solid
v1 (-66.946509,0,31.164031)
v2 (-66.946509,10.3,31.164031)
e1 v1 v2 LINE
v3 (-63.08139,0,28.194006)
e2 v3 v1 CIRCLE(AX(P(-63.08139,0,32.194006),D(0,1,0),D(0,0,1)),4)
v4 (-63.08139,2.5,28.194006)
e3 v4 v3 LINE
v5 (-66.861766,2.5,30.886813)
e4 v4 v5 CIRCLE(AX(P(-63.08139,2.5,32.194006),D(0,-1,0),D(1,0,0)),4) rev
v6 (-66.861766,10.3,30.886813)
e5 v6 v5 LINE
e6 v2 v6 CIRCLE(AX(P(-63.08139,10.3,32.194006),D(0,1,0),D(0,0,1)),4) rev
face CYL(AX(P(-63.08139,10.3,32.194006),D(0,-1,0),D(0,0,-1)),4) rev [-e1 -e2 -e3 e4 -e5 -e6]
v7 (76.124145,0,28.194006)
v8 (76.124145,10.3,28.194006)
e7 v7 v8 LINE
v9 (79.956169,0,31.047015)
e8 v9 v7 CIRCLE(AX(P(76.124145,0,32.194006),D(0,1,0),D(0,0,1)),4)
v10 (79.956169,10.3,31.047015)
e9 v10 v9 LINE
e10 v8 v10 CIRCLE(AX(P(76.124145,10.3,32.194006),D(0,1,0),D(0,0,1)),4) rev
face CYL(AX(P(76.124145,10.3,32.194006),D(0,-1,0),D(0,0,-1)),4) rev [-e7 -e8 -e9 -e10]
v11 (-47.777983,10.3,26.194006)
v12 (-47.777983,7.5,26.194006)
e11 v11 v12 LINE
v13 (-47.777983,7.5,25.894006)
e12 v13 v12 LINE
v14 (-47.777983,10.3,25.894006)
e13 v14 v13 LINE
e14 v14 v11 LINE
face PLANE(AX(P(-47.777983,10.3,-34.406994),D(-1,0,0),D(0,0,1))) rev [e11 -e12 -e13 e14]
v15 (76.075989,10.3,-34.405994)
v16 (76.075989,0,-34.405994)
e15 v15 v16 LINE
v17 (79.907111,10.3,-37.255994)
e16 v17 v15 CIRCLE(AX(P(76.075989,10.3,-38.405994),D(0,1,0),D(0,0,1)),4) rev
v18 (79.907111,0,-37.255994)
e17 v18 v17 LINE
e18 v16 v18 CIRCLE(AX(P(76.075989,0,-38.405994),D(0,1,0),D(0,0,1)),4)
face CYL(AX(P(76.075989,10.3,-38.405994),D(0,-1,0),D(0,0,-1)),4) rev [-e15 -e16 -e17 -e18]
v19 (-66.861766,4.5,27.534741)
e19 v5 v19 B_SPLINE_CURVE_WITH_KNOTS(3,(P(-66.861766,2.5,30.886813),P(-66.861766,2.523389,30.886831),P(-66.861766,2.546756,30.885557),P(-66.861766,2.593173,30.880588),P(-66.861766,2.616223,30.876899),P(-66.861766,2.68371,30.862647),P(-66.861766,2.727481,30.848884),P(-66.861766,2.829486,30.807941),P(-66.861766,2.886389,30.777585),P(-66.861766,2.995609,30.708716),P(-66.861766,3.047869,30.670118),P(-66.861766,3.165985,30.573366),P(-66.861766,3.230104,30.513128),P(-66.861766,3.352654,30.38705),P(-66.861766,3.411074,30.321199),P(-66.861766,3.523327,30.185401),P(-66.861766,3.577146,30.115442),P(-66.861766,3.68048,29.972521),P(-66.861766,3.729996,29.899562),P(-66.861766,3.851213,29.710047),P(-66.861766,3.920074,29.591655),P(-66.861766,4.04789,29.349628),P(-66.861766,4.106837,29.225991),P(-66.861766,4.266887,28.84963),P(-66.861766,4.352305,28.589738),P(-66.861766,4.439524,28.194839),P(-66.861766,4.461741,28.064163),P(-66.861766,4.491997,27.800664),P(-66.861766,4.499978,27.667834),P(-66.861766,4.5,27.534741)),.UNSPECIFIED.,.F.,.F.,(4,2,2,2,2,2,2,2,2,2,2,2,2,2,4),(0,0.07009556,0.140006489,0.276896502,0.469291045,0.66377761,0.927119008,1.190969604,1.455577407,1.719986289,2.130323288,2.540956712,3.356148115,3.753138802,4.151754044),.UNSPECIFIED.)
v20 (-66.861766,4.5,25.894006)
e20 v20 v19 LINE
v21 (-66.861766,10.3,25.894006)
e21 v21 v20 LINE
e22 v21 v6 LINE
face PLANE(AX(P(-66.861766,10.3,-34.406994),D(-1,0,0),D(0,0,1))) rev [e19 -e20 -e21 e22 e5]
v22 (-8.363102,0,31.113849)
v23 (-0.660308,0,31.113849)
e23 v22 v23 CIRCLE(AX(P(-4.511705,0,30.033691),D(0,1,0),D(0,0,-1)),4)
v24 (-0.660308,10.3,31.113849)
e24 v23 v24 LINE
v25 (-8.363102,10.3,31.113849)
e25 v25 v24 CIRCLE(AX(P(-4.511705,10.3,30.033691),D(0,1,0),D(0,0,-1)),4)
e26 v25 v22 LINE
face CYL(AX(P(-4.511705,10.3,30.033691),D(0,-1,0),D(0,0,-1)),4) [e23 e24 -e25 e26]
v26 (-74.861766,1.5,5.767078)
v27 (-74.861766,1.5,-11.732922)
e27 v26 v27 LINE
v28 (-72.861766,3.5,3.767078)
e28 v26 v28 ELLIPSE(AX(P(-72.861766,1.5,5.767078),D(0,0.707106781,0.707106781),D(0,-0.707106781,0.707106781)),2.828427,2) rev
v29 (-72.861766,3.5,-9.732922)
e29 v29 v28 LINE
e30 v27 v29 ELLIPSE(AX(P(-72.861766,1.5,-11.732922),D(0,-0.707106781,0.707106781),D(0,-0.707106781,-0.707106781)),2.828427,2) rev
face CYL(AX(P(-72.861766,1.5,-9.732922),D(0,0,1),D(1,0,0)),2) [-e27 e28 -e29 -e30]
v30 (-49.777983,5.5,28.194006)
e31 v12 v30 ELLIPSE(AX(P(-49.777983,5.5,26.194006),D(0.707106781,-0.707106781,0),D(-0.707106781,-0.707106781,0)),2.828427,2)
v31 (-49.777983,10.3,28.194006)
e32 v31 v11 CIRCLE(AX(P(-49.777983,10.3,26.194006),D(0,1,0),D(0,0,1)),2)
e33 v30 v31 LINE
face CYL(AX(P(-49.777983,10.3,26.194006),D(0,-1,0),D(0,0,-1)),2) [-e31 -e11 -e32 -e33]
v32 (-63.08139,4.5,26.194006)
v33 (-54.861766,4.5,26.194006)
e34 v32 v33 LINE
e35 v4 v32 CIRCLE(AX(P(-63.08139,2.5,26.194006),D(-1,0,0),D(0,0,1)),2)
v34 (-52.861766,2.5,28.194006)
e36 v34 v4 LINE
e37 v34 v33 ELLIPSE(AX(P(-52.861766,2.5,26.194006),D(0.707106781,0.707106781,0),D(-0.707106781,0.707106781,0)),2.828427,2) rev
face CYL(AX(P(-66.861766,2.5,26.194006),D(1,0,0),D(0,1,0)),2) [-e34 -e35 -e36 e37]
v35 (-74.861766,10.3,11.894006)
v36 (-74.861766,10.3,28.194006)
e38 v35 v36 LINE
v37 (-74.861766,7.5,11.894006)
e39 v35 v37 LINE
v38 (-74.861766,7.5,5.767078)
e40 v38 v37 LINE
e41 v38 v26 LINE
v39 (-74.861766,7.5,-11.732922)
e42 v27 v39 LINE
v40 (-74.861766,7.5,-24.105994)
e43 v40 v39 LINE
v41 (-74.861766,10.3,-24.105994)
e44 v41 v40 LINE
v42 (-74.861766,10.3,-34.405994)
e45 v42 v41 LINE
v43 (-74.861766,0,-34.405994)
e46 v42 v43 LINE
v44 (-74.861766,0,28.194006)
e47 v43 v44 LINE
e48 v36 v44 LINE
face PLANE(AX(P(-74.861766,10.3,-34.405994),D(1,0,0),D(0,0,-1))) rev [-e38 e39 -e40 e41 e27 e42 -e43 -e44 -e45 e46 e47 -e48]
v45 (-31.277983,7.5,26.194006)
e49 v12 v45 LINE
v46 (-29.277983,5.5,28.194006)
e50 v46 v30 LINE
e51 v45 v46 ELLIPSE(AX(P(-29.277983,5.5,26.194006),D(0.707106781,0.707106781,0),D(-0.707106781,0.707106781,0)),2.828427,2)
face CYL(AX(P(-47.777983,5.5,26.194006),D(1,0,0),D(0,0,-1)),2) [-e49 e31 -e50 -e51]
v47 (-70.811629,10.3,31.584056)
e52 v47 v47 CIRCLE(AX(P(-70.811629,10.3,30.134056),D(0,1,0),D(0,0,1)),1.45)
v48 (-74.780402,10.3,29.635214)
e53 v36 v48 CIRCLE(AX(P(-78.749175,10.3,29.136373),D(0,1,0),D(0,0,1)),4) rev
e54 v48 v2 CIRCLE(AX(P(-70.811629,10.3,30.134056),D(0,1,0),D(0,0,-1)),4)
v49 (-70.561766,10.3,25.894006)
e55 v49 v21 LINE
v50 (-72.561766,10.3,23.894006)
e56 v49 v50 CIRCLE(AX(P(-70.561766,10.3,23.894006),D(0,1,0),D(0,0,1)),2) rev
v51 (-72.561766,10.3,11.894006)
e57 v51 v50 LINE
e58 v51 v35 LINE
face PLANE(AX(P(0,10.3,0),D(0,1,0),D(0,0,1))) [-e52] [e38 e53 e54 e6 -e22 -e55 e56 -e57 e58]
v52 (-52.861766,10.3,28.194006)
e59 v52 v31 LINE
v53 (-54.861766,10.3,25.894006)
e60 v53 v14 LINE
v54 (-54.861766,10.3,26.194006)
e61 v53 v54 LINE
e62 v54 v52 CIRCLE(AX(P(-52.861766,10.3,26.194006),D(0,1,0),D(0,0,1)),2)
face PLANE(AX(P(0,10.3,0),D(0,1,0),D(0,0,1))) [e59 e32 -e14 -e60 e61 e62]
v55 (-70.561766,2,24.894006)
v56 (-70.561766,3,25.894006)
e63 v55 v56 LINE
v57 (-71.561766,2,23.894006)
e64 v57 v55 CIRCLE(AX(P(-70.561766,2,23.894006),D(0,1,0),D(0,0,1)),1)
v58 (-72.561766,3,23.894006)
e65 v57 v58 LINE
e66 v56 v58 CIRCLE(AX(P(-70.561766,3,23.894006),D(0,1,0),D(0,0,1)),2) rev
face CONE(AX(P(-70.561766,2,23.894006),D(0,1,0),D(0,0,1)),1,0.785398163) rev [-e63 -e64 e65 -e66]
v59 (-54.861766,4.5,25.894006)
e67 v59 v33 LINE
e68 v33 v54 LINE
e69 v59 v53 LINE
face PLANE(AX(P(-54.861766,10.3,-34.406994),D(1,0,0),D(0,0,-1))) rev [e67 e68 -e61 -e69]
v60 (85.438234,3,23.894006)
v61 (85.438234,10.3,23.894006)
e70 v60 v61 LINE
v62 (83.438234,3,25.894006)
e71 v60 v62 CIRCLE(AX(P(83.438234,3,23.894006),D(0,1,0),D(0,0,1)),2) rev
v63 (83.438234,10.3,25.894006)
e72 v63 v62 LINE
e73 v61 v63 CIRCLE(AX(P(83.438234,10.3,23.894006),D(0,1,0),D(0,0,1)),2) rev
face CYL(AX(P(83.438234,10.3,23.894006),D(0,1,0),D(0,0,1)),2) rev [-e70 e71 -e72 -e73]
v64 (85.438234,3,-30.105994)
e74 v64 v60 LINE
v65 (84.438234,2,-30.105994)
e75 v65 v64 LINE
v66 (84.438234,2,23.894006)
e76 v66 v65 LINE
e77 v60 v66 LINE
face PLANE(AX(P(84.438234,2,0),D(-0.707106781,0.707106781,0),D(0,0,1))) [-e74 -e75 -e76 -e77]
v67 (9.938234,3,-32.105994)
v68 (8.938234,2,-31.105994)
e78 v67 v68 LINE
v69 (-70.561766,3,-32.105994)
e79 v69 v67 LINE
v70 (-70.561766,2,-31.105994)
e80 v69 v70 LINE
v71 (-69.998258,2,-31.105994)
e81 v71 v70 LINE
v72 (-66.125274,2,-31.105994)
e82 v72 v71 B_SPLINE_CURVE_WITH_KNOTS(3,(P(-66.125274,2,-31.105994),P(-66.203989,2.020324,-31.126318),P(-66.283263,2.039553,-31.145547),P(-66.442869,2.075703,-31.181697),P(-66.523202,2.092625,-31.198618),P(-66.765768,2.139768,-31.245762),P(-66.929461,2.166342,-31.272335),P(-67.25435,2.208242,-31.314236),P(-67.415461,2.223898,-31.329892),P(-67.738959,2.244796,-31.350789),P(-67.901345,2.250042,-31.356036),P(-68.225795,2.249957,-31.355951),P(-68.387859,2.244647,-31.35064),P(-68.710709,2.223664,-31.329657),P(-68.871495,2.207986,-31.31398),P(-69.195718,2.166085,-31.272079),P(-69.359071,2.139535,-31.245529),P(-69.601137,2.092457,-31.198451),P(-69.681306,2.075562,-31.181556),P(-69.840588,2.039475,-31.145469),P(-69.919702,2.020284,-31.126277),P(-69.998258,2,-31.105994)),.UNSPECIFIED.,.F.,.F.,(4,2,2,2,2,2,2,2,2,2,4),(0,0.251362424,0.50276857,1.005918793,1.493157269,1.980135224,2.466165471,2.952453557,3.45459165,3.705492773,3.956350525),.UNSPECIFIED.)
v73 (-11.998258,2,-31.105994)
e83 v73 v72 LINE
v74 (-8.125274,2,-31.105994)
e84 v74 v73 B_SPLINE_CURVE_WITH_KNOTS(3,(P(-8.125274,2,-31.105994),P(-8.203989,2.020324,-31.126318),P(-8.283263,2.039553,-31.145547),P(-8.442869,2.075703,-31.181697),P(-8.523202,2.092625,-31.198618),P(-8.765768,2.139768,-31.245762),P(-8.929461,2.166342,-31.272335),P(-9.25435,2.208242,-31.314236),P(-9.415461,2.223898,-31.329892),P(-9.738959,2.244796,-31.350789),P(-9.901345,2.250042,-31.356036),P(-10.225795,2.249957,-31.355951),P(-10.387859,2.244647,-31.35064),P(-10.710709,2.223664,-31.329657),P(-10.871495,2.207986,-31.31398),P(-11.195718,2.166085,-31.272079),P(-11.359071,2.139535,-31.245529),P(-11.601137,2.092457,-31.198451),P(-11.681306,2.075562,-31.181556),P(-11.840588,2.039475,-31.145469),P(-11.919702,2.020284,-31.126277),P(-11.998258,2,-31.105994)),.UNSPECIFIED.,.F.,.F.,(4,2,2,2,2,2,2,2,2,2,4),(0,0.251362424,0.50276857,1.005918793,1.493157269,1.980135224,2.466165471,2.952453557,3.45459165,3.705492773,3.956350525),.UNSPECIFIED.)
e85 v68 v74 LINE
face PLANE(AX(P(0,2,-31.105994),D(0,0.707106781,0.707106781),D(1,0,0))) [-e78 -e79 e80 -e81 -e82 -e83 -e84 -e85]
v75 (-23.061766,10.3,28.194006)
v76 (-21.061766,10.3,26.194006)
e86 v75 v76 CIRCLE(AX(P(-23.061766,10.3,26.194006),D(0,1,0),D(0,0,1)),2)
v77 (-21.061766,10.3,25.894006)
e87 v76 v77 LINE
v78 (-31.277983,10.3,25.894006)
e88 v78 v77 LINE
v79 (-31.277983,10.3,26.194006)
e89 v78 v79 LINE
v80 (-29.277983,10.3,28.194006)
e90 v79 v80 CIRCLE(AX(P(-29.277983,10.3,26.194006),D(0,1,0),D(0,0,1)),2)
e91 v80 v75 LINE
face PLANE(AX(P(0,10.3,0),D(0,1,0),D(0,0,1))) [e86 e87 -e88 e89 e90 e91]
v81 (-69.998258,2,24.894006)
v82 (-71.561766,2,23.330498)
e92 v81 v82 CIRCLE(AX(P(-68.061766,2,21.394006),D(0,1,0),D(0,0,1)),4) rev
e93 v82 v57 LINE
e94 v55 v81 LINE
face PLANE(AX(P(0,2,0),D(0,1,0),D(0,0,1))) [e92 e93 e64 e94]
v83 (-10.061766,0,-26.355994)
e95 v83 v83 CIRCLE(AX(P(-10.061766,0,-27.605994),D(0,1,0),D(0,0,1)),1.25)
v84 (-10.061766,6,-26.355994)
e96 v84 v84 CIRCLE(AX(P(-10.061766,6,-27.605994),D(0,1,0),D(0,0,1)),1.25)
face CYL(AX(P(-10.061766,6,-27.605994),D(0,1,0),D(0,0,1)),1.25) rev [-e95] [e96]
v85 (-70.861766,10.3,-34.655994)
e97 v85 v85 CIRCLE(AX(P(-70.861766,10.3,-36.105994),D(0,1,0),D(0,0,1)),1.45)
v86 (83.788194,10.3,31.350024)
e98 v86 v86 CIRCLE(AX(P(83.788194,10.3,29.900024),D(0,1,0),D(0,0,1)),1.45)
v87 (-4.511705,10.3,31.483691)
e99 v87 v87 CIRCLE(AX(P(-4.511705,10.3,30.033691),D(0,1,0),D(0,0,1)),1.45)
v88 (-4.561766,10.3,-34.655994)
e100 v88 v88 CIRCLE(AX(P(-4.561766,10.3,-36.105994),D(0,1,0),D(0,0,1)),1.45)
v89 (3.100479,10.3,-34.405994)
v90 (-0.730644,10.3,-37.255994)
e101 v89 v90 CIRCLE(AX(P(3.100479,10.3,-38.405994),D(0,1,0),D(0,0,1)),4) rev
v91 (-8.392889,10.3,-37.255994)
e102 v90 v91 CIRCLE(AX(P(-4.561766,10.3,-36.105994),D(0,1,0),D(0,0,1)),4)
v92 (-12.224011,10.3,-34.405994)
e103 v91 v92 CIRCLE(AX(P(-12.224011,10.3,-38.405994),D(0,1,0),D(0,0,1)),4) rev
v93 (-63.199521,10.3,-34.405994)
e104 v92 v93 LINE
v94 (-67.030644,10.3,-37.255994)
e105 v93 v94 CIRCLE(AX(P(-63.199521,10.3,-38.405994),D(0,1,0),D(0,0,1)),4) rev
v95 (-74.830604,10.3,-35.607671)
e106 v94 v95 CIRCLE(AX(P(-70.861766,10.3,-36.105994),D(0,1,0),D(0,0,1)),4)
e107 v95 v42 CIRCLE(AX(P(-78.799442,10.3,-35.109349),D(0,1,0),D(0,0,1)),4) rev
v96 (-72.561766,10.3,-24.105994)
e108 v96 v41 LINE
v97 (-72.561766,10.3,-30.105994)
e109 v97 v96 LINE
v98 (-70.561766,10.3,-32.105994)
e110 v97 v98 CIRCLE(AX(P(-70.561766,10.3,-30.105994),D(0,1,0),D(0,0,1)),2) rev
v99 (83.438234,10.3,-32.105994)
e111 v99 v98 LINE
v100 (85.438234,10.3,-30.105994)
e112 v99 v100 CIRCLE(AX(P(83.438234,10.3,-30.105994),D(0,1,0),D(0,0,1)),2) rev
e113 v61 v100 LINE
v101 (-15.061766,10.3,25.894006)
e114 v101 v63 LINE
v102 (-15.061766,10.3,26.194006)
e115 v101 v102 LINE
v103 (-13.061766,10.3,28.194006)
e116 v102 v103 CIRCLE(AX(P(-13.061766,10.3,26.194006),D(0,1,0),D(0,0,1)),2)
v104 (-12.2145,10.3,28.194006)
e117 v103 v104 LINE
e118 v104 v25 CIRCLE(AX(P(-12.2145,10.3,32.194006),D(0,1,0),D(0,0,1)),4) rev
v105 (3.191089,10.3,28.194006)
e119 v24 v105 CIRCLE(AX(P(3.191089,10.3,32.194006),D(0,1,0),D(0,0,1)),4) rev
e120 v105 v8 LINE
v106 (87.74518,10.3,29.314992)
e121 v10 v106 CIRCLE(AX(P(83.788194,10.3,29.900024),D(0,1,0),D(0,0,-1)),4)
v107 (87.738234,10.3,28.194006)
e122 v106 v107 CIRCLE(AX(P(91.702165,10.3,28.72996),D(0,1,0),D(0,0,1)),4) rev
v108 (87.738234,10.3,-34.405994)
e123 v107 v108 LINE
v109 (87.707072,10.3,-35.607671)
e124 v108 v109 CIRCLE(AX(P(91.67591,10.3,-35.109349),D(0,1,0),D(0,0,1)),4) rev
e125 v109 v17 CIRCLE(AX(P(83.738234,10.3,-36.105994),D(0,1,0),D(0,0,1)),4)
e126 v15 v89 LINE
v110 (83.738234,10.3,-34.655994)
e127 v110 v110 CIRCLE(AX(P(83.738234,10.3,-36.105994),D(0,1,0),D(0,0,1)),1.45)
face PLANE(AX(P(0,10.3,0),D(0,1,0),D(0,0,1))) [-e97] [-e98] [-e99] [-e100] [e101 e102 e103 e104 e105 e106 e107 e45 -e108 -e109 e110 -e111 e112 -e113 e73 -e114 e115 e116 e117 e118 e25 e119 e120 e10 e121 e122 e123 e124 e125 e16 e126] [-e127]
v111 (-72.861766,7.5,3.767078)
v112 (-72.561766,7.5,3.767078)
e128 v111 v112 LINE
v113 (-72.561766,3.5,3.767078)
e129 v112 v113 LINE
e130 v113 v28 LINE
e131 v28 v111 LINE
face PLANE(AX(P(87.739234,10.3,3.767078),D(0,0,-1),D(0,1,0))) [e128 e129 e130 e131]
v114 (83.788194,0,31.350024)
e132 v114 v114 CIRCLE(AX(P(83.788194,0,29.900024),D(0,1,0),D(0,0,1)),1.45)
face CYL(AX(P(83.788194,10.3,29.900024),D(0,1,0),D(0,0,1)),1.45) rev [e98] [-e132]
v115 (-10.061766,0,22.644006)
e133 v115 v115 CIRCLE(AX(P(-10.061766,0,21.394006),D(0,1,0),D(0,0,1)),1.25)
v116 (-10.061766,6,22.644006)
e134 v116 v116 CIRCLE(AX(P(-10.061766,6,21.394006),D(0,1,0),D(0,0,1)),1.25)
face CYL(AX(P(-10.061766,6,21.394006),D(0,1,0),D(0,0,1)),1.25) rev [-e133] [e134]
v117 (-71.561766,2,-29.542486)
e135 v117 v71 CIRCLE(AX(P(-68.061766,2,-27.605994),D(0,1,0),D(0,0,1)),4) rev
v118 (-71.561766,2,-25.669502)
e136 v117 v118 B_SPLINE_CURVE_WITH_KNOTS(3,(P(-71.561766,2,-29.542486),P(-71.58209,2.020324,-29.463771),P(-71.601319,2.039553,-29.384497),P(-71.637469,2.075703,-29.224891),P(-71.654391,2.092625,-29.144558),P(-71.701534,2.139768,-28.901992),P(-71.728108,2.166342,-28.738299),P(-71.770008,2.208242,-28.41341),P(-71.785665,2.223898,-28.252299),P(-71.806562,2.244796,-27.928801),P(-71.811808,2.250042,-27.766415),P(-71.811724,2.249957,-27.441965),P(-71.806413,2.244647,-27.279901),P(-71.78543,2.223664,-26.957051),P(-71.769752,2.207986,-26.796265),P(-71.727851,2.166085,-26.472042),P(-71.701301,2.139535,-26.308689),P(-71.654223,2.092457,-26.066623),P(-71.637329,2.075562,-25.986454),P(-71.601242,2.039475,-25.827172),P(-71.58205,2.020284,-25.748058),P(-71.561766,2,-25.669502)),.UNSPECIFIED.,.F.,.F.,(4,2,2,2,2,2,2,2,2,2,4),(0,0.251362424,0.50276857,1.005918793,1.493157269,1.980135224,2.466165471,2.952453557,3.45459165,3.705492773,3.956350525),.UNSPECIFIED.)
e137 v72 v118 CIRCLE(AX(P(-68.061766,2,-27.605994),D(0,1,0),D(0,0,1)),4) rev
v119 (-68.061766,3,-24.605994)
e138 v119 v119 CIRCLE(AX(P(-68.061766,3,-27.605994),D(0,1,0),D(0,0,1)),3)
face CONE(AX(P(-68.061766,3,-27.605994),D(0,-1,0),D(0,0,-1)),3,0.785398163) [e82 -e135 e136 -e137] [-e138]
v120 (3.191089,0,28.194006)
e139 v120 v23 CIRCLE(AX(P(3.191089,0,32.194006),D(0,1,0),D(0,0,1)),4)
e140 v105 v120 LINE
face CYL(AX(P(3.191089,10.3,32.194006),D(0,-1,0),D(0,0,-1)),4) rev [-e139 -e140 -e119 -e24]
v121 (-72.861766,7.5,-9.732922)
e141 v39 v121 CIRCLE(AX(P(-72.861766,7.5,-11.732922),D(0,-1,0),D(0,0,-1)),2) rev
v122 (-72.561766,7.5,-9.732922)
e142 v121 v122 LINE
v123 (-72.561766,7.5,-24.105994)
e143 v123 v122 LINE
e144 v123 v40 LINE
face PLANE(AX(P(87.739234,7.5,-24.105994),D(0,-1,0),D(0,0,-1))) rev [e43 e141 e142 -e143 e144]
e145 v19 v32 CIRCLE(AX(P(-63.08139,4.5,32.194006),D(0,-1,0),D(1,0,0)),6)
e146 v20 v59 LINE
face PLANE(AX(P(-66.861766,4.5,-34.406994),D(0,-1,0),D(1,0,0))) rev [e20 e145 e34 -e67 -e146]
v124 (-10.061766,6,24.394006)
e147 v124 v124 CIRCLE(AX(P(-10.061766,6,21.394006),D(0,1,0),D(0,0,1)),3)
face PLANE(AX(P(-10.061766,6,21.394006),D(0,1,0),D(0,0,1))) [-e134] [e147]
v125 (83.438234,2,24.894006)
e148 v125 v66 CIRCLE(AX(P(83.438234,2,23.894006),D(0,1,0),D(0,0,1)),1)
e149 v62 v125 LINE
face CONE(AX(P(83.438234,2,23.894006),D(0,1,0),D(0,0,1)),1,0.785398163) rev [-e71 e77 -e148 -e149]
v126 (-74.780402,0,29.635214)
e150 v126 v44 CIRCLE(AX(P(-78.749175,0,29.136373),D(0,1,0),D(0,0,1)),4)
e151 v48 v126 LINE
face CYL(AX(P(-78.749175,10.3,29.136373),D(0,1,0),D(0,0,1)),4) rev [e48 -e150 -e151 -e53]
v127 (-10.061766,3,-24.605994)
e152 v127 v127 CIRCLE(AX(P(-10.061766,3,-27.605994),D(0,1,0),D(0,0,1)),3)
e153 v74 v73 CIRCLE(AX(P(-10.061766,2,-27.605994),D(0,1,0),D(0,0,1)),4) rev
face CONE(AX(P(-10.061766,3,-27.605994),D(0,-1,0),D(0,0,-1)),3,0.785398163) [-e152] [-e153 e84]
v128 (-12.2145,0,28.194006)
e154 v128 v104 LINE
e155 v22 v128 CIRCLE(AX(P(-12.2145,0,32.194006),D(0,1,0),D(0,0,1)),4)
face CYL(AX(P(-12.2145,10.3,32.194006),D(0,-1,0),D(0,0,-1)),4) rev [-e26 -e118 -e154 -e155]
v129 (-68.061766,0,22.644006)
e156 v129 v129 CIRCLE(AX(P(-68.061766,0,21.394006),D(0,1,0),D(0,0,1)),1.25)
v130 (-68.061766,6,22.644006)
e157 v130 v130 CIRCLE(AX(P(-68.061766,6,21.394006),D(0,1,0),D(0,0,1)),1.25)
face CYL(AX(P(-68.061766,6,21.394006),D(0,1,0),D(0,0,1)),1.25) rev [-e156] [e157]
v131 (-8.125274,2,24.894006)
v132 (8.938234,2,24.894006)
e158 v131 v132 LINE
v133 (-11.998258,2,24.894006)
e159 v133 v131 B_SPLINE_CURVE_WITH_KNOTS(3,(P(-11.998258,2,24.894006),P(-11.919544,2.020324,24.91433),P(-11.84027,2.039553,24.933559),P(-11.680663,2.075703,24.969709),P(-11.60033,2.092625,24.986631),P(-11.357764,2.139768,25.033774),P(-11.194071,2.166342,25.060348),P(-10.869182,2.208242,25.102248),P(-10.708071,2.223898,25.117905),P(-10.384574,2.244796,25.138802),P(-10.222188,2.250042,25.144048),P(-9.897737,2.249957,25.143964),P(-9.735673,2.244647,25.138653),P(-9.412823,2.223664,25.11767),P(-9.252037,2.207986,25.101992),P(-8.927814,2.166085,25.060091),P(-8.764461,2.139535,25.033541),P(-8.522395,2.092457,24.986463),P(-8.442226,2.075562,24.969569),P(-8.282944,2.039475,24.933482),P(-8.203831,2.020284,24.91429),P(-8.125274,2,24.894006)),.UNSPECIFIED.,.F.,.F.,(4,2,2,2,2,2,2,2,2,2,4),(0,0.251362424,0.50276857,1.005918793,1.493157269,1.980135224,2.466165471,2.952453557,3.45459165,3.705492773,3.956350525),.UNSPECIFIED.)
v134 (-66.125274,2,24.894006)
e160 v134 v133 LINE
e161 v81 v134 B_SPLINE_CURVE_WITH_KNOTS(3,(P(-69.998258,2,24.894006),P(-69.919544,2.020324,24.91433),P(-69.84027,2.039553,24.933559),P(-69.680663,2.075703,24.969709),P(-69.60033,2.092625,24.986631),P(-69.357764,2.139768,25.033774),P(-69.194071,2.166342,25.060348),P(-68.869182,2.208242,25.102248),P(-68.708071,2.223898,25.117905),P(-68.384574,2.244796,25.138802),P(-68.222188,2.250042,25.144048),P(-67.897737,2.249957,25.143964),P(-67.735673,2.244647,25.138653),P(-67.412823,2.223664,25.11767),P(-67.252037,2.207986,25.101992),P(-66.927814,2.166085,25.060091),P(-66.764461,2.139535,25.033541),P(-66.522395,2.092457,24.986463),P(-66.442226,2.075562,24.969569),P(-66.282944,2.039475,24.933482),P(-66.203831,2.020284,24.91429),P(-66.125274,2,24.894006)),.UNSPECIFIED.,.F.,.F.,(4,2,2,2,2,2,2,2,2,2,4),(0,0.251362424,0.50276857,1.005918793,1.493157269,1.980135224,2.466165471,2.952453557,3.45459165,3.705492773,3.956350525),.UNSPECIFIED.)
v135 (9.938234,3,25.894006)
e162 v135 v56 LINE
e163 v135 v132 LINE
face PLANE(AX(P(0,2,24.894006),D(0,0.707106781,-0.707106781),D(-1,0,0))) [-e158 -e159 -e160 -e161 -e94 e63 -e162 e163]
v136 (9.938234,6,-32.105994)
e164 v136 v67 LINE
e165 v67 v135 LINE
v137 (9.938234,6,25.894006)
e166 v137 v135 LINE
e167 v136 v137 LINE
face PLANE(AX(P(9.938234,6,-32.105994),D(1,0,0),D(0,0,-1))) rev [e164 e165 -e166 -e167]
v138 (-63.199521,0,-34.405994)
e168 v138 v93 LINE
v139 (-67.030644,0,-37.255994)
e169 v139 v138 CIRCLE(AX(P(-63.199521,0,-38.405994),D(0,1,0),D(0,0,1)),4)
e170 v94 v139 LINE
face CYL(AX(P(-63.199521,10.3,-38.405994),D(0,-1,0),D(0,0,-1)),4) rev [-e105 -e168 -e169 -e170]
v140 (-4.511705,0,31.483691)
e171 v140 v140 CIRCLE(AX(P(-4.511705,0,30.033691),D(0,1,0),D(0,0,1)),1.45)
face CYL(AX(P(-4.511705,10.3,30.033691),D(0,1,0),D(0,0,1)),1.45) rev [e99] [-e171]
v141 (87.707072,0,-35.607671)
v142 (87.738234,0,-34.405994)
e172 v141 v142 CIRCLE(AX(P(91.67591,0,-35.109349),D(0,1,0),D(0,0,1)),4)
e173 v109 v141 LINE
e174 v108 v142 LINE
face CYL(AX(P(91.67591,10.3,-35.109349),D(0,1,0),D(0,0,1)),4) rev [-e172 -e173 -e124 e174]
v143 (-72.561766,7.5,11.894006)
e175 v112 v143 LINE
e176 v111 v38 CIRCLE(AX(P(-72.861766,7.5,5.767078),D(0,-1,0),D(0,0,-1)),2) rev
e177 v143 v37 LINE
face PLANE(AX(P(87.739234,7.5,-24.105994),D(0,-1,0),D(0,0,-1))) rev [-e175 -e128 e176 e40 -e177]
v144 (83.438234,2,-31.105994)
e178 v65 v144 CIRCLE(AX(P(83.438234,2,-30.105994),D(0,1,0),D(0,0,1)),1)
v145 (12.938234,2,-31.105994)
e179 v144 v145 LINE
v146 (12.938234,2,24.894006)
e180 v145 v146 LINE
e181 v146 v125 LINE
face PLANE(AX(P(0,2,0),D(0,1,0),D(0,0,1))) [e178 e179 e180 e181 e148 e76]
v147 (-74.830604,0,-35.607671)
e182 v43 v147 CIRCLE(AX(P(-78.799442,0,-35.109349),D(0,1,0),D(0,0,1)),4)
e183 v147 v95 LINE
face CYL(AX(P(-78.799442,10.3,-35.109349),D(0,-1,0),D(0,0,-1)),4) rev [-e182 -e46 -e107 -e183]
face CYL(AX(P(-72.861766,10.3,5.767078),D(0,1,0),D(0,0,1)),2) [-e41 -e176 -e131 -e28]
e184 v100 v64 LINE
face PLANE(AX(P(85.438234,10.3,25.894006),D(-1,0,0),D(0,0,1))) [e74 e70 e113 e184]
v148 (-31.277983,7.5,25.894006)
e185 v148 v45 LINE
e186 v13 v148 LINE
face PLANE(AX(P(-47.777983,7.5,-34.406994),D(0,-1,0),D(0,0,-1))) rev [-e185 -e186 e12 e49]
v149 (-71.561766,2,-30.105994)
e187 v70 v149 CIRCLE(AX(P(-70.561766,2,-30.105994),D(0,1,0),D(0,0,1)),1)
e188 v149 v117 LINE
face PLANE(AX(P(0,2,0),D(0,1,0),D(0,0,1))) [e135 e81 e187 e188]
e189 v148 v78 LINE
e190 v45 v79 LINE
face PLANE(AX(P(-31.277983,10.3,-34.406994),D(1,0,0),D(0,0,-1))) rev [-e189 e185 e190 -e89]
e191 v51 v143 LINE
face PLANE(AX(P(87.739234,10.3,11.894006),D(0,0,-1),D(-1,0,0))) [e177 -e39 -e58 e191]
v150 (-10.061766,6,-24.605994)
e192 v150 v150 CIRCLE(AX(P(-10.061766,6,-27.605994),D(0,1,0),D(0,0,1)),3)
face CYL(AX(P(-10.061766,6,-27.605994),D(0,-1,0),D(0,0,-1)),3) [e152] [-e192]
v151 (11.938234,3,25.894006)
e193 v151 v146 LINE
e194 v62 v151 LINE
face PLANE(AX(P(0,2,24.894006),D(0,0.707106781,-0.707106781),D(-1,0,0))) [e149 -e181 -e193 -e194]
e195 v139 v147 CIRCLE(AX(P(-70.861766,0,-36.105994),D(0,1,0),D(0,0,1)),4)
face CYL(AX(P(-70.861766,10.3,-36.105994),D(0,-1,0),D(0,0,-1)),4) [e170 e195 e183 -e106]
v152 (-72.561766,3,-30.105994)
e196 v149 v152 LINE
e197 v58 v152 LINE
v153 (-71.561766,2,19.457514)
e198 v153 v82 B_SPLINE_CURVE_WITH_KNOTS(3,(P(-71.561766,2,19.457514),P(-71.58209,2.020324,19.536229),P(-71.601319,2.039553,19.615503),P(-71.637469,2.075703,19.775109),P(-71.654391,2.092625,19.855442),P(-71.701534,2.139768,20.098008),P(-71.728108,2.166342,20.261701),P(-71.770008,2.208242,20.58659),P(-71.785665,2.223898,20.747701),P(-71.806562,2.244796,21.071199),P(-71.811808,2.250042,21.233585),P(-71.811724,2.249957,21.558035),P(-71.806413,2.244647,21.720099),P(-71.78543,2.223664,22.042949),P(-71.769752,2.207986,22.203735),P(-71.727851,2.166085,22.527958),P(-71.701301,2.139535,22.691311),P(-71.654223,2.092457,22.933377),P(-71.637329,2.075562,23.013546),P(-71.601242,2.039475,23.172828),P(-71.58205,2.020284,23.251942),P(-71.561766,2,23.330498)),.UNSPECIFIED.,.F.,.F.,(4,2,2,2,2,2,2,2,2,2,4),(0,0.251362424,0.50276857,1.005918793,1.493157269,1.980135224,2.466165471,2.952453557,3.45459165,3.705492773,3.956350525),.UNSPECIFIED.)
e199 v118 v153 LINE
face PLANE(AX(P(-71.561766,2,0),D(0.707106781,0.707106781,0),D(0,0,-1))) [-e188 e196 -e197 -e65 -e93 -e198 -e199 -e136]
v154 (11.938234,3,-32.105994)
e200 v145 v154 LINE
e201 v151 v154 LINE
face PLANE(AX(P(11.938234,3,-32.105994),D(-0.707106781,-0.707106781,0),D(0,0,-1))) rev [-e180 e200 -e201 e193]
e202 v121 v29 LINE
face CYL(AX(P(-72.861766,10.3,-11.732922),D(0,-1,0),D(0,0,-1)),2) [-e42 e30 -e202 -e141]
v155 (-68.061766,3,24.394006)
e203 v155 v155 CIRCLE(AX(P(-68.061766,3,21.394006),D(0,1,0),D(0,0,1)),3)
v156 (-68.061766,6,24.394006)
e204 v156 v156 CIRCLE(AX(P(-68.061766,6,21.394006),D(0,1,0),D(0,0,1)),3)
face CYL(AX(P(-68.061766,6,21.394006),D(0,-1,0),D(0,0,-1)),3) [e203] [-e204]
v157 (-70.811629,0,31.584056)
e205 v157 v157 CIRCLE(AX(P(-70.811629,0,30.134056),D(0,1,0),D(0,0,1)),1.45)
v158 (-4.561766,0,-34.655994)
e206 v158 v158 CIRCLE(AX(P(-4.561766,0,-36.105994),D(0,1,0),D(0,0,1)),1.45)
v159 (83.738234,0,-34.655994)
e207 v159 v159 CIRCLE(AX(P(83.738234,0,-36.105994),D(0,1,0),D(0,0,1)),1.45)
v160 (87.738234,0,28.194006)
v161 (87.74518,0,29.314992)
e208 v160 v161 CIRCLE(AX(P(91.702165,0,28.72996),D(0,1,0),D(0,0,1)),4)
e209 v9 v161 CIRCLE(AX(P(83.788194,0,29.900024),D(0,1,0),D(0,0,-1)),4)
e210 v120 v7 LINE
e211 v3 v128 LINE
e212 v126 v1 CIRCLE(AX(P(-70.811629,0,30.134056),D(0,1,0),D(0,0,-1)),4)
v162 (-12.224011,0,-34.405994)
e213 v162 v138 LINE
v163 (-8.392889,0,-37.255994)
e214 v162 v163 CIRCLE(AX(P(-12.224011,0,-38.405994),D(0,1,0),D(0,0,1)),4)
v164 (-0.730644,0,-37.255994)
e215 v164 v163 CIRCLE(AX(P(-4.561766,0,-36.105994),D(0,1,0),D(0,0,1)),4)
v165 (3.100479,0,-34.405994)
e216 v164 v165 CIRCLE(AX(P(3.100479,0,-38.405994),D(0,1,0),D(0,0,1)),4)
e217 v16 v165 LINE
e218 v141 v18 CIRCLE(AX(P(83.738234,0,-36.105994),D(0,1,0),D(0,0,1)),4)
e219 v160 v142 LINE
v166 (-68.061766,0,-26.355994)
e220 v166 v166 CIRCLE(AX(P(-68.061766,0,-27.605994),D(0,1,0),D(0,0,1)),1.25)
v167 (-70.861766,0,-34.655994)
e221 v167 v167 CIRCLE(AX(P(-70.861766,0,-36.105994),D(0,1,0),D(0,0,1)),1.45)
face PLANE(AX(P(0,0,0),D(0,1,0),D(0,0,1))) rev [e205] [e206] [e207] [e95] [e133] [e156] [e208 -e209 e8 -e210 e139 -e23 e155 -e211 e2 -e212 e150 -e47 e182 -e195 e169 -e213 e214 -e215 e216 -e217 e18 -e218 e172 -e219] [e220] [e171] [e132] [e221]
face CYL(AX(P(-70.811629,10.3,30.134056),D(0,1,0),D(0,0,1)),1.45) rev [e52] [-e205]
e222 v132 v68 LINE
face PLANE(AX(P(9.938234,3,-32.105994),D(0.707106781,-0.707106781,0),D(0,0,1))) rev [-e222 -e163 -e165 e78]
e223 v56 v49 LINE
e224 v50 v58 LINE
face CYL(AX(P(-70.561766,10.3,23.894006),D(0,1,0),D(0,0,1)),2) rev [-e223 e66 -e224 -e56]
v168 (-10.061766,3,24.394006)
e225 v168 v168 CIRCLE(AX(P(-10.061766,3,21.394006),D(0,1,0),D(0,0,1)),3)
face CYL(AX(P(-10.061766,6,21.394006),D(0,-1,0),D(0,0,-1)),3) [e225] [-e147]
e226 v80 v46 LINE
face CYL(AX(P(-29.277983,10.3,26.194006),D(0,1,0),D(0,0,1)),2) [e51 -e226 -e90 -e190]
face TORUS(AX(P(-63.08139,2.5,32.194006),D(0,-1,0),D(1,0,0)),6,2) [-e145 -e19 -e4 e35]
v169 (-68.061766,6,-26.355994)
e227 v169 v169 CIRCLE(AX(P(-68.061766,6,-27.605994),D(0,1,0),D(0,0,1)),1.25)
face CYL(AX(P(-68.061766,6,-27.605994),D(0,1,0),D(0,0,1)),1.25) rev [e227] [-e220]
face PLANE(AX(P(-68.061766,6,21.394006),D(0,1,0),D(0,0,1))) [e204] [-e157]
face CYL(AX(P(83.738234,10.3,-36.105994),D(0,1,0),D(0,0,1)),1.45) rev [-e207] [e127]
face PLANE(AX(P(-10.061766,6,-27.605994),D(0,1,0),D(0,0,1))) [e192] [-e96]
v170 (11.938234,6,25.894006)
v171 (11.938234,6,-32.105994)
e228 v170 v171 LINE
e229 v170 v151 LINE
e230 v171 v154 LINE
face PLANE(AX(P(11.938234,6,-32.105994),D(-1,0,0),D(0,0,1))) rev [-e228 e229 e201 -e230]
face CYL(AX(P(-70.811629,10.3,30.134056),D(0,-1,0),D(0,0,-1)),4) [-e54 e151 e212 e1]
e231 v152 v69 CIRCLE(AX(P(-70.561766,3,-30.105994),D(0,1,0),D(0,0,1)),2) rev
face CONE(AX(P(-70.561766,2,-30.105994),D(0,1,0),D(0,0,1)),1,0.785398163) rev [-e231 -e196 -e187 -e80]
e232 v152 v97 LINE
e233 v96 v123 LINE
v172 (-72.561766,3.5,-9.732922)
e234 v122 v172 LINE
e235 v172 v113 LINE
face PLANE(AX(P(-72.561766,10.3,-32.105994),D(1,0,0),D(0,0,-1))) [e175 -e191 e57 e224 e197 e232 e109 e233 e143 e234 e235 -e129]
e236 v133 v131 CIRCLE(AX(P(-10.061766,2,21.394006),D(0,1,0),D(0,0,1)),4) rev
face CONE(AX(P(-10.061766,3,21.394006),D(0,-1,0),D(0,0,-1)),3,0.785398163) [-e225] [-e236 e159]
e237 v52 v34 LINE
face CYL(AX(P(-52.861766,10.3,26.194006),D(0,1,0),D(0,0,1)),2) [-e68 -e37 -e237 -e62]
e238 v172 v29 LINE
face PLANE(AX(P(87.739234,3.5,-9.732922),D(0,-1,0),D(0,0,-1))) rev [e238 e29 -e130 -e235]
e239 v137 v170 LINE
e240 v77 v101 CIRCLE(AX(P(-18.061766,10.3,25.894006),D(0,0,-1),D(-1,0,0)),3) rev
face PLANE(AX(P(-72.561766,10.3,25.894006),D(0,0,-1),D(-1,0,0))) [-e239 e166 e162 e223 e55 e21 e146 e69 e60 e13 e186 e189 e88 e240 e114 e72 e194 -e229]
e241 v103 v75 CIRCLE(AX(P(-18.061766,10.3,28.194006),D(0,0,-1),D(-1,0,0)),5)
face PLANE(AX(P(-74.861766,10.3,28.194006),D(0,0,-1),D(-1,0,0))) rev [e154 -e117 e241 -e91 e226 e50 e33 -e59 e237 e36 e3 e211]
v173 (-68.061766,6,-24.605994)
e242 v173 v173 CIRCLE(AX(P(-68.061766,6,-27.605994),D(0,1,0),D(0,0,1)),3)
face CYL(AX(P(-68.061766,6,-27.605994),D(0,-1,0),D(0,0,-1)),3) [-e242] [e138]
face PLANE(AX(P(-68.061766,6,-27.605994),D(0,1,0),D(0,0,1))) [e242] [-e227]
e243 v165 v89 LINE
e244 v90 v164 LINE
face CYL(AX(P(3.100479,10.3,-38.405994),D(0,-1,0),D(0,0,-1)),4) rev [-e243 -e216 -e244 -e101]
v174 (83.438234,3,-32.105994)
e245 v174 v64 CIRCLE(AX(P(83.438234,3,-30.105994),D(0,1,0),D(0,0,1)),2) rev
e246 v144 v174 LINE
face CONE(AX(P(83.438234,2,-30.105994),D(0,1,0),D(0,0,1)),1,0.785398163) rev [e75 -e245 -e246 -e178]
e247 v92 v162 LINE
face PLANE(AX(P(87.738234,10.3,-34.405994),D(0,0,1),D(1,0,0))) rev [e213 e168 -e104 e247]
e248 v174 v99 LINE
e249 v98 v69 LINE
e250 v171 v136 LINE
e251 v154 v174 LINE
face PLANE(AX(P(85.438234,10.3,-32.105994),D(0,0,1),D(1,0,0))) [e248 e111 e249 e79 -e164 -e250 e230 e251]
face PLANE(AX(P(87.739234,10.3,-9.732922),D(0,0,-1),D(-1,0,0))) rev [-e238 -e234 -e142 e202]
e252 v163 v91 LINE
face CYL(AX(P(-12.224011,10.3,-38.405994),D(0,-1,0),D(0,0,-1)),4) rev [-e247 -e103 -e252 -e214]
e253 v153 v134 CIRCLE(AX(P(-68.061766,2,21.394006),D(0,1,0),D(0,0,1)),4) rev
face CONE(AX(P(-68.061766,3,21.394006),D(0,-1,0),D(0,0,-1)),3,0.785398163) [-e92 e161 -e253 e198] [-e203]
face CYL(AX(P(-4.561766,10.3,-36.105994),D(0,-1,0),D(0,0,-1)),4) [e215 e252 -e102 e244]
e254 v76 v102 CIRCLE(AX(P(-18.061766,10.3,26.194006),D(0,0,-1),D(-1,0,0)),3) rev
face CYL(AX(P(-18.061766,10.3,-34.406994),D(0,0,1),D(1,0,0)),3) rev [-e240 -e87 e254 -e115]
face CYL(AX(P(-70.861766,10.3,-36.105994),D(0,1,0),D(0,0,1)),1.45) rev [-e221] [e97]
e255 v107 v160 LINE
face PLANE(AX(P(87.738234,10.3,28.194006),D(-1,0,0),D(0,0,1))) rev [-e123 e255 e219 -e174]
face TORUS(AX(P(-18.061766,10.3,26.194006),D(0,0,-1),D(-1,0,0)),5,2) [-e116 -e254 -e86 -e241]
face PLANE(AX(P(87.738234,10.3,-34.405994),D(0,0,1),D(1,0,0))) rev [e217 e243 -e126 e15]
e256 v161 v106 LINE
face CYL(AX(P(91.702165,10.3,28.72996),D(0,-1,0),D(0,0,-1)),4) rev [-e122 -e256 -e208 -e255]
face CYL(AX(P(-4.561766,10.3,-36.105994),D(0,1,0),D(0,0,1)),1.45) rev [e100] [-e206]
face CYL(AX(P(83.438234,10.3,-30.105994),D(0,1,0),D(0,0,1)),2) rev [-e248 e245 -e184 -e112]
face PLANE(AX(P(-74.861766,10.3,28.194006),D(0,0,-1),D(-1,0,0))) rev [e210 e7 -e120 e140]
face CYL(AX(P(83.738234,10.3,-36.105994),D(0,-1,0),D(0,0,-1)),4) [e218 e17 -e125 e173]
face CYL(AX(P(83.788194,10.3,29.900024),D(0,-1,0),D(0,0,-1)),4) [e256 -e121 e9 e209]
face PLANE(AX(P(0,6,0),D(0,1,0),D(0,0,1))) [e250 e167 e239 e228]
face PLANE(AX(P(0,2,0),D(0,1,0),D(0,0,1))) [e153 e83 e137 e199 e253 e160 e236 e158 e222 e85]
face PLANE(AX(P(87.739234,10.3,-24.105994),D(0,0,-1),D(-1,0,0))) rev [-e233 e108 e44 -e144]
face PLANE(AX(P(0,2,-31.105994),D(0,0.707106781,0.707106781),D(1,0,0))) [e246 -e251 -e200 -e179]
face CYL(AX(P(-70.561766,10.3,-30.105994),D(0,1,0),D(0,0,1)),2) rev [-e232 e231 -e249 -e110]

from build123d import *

# Parameters (mm, degrees)
SKETCH3_W                      = 162.6
SKETCH3_H                      = 62.6
SKETCH3_W_2                    = 158
SKETCH3_H_2                    = 58
BOSS_EXTRUDE1_DEPTH            = 10.3
SKETCH5_W                      = 158
SKETCH5_H                      = 58
BOSS_EXTRUDE2_DEPTH            = 2
SKETCH6_R                      = 3
BOSS_EXTRUDE3_DEPTH            = 4
F_2_5_2_5_DIAMETER_HOLE1_D     = 2.5
F_2_5_2_5_DIAMETER_HOLE1_DEPTH = 8
F_2_5_2_5_DIAMETER_HOLE1_TIP   = 0.751075774
SKETCH10_W                     = 2
SKETCH10_H                     = 58
BOSS_EXTRUDE4_DEPTH            = 4
CUT_EXTRUDE1_REACH             = 110.272
SKETCH11_R                     = 3
SKETCH11_W                     = 12
SKETCH11_H                     = 5.8
SKETCH11_W_2                   = 16.5
SKETCH11_H_2                   = 2.8
CUT_EXTRUDE2_REACH             = 168.519
SKETCH12_W                     = 13.5
SKETCH12_H                     = 6.8
SKETCH12_W_2                   = 36
SKETCH12_H_2                   = 2.8
SKETCH13_R                     = 4
BOSS_EXTRUDE5_DEPTH            = 10.3
FILLET2_R                      = 4
FILLET3_R                      = 4
FILLET4_R                      = 4
F_2_9_2_9_DIAMETER_HOLE1_D     = 2.9
FILLET6_R                      = 2
FILLET7_R                      = 2
FILLET8_R                      = 2
CHAMFER1_SIZE                  = 1
CHAMFER2_SIZE                  = 1
FILLET9_R                      = 2


with BuildPart() as part:
    # Sketch3 → Boss-Extrude1 (new body)
    with BuildSketch(Plane(origin=(0, 0, 0), x_dir=(1, 0, 0), z_dir=(0, 1, 0))):
        with Locations((6.438233838, 3.105993834)):
            Rectangle(SKETCH3_W, SKETCH3_H)
        with Locations((6.438233838, 3.105993834)):
            Rectangle(SKETCH3_W_2, SKETCH3_H_2, mode=Mode.SUBTRACT)
    extrude(amount=BOSS_EXTRUDE1_DEPTH)

    # Sketch5 → Boss-Extrude2 (add)
    with BuildSketch(Plane(origin=(0, 0, 0), x_dir=(1, 0, 0), z_dir=(0, 1, 0))):
        with Locations((6.438233838, 3.105993834)):
            Rectangle(SKETCH5_W, SKETCH5_H)
    extrude(amount=BOSS_EXTRUDE2_DEPTH)

    # Sketch6 → Boss-Extrude3 (add)
    with BuildSketch(Plane(origin=(0, 2, 0), x_dir=(1, 0, 0), z_dir=(0, 1, 0))):
        with Locations(Location((-68.061766162, 27.605993834, 0), (0, 0, 270))):
            Circle(SKETCH6_R)
        with Locations(Location((-68.061766162, -21.394006166, 0), (0, 0, 270))):
            Circle(SKETCH6_R)
        with Locations(Location((-10.061766162, -21.394006166, 0), (0, 0, 270))):
            Circle(SKETCH6_R)
        with Locations(Location((-10.061766162, 27.605993834, 0), (0, 0, 270))):
            Circle(SKETCH6_R)
    extrude(amount=BOSS_EXTRUDE3_DEPTH)

    # Ø2.5 (2.5) Diameter Hole1
    with Locations(Plane(origin=(0, 6, 0), x_dir=(1, 0, 0), z_dir=(0, 1, 0))):
        with Locations((-68.061766162, 27.605993834), (-10.061766162, 27.605993834), (-10.061766162, -21.394006166), (-68.061766162, -21.394006166)):
            Hole(F_2_5_2_5_DIAMETER_HOLE1_D / 2, depth=F_2_5_2_5_DIAMETER_HOLE1_DEPTH)
            with Locations((0, 0, -(F_2_5_2_5_DIAMETER_HOLE1_DEPTH + F_2_5_2_5_DIAMETER_HOLE1_TIP / 2))):  # 118° drill point
                Cone(0, F_2_5_2_5_DIAMETER_HOLE1_D / 2, F_2_5_2_5_DIAMETER_HOLE1_TIP, mode=Mode.SUBTRACT)

    # Sketch10 → Boss-Extrude4 (add)
    with BuildSketch(Plane(origin=(0, 2, 0), x_dir=(1, 0, 0), z_dir=(0, 1, 0))):
        with Locations((10.938233838, 3.105993834)):
            Rectangle(SKETCH10_W, SKETCH10_H)
    extrude(amount=BOSS_EXTRUDE4_DEPTH)

    # Sketch11 → Cut-Extrude1 (cut, up to next)
    with BuildSketch(Plane.XY.offset(28.194006166), mode=Mode.PRIVATE) as cut_extrude1_sk1:
        with Locations((-18.061766162, 10.3)):
            Circle(SKETCH11_R)
    cut_extrude1_tool1 = extrude(cut_extrude1_sk1.sketch, amount=-CUT_EXTRUDE1_REACH, mode=Mode.PRIVATE) & part.part
    # Sketch11 → Cut-Extrude1 (cut, up to next)
    with BuildSketch(Plane.XY.offset(28.194006166), mode=Mode.PRIVATE) as cut_extrude1_sk2:
        with Locations((-60.861766162, 7.4)):
            Rectangle(SKETCH11_W, SKETCH11_H)
    cut_extrude1_tool2 = extrude(cut_extrude1_sk2.sketch, amount=-CUT_EXTRUDE1_REACH, mode=Mode.PRIVATE) & part.part
    # Sketch11 → Cut-Extrude1 (cut, up to next)
    with BuildSketch(Plane.XY.offset(28.194006166), mode=Mode.PRIVATE) as cut_extrude1_sk3:
        with Locations((-39.527982648, 8.9)):
            Rectangle(SKETCH11_W_2, SKETCH11_H_2)
    cut_extrude1_tool3 = extrude(cut_extrude1_sk3.sketch, amount=-CUT_EXTRUDE1_REACH, mode=Mode.PRIVATE) & part.part
    add(cut_extrude1_tool1.solids().sort_by_distance((-18.061766, 10.3, 28.194006))[0], mode=Mode.SUBTRACT)
    add(cut_extrude1_tool2.solids().sort_by_distance((-60.861766, 7.4, 28.194006))[0], mode=Mode.SUBTRACT)
    add(cut_extrude1_tool3.solids().sort_by_distance((-39.527983, 8.9, 28.194006))[0], mode=Mode.SUBTRACT)

    # Sketch12 → Cut-Extrude2 (cut, up to next)
    with BuildSketch(Plane.ZY.offset(74.861766162), mode=Mode.PRIVATE) as cut_extrude2_sk1:
        with Locations((-2.982922372, 6.9)):
            Rectangle(SKETCH12_W, SKETCH12_H)
    cut_extrude2_tool1 = extrude(cut_extrude2_sk1.sketch, amount=-CUT_EXTRUDE2_REACH, mode=Mode.PRIVATE) & part.part
    # Sketch12 → Cut-Extrude2 (cut, up to next)
    with BuildSketch(Plane.ZY.offset(74.861766162), mode=Mode.PRIVATE) as cut_extrude2_sk2:
        with Locations((-6.105993834, 8.9)):
            Rectangle(SKETCH12_W_2, SKETCH12_H_2)
    cut_extrude2_tool2 = extrude(cut_extrude2_sk2.sketch, amount=-CUT_EXTRUDE2_REACH, mode=Mode.PRIVATE) & part.part
    add(cut_extrude2_tool1.solids().sort_by_distance((-74.861766, 6.9, -2.982922))[0], mode=Mode.SUBTRACT)
    add(cut_extrude2_tool2.solids().sort_by_distance((-74.861766, 8.9, -6.105994))[0], mode=Mode.SUBTRACT)

    # Sketch13 → Boss-Extrude5 (add)
    with BuildSketch(Plane(origin=(0, 0, 0), x_dir=(1, 0, 0), z_dir=(0, 1, 0))):
        with Locations((-70.861766162, 36.105993834)):
            Circle(SKETCH13_R)
        with Locations((-4.561766162, 36.105993834)):
            Circle(SKETCH13_R)
        with Locations((83.738233838, 36.105993834)):
            Circle(SKETCH13_R)
        with Locations((83.788193598, -29.900023528)):
            Circle(SKETCH13_R)
        with Locations((-4.511705229, -30.033691472)):
            Circle(SKETCH13_R)
        with Locations((-70.811629263, -30.134055965)):
            Circle(SKETCH13_R)
    extrude(amount=BOSS_EXTRUDE5_DEPTH)

    # Fillet2
    # the kernel refuses this fillet: 4 mm, written as the material it adds along each edge
    with BuildSketch(Plane(origin=(-74.48253956, 10.3, -34.405993834), x_dir=(-1, 0, 0), z_dir=(0, -1, 0))) as fillet2_piece_1:
        with BuildLine():
            CenterArc((4.316902517, 0.703355094), FILLET2_R, 172.843462622, 17.284010607)
            Line((0.348064559, 1.201677547), (0.2686878, 1.211643996))
            ThreePointArc((0.2686878, 1.211643996), (0.144462277, 0.609403692), (-0.072415468, 0.034))
            Line((-0.072415468, 0.034), (0, -0.08))
            ThreePointArc((0, -0.08), (0.189613301, -0.08), (0.300473084, -0.014067102))
            Line((0.300473084, -0.014067102), (0.379226602, 0))
        make_face()
    extrude(amount=10.3)

    # Fillet3
    fillet3_edges = [part.edges().sort_by_distance(p)[0] for p in [
        (80.170251537, 5.15, 28.194006166),
        (-67.313600279, 5.15, 28.194006166),
        (-0.959866554, 5.15, 28.194006166),
        (-8.063543904, 5.15, 28.194006166),
        (80.11746044, 5.15, -34.405993834),
        (-8.18253956, 5.15, -34.405993834),
        (-0.940992764, 5.15, -34.405993834),
        (-67.240992764, 5.15, -34.405993834),
    ]]
    fillet(fillet3_edges, radius=FILLET3_R)

    # Fillet4
    # the kernel refuses this fillet: 4 mm, written as the material it adds along each edge
    with BuildSketch(Plane(origin=(-74.309658248, 10.3, 28.194006166), x_dir=(-0.3104883041224667, 0, 0.9505771999175842), z_dir=(0, -1, 0))) as fillet4_piece_1:
        with BuildLine():
            CenterArc((2.274210055, 3.927509369), FILLET4_R, 238.284839943, 20.790532392)
            Line((0.17142305, 0.524821195), (0.12936731, 0.456767432))
            ThreePointArc((0.12936731, 0.456767432), (0.009665349, 0.287249662), (-0.076046176, 0.024839064))
            Line((-0.076046176, 0.024839064), (0.0151614, -0.078550187))
            ThreePointArc((0.0151614, -0.078550187), (0.758070018, -0.007509369), (1.500978636, -0.078550187))
            Line((1.500978636, -0.078550187), (1.516140037, 0))
        make_face()
    extrude(amount=10.3)
    with BuildSketch(Plane(origin=(87.40613566, 10.3, 28.194006166), x_dir=(0.28950004404714813, 0, 0.9571780004245288), z_dir=(0, -1, 0))) as fillet4_piece_2_section:
        with BuildLine():
            CenterArc((1.756703704, -3.95690665), FILLET4_R, 98.41789371, 16.110259487)
            Line((0.096142437, -0.31787707), (0.062931212, -0.245096478))
            ThreePointArc((0.062931212, -0.245096478), (-0.028503021, -0.182098539), (-0.07657424, -0.023160004))
            Line((-0.07657424, -0.023160004), (0.011711358, 0.079138133))
            ThreePointArc((0.011711358, 0.079138133), (0.585567901, 0.03690665), (1.159424444, 0.079138133))
            Line((1.159424444, 0.079138133), (1.171135802, 0))
        make_face()
    fillet4_piece_2 = extrude(amount=10.3, mode=Mode.PRIVATE)
    fillet4_piece_2 = split(fillet4_piece_2, bisect_by=Plane(origin=(87.738233838, 5.15, 28.552797163), z_dir=(-1, 0, 0)), keep=Keep.TOP, mode=Mode.PRIVATE)
    add(fillet4_piece_2)
    with BuildSketch(Plane(origin=(87.359007236, 10.3, -34.405993834), x_dir=(1, 0, 0), z_dir=(0, -1, 0))) as fillet4_piece_3:
        with BuildLine():
            CenterArc((4.316902517, -0.703355094), FILLET4_R, 169.87252677, 17.284010607)
            Line((0.348064559, -1.201677547), (0.2686878, -1.211643996))
            ThreePointArc((0.2686878, -1.211643996), (0.144462277, -0.609403692), (-0.072415468, -0.034))
            Line((-0.072415468, -0.034), (0, 0.08))
            ThreePointArc((0, 0.08), (0.189613301, 0.08), (0.300473084, 0.014067102))
            Line((0.300473084, 0.014067102), (0.379226602, 0))
        make_face()
    extrude(amount=10.3)

    # Ø2.9 (2.9) Diameter Hole1 (through all)
    with Locations(Plane(origin=(0, 10.3, 0), x_dir=(1, 0, 0), z_dir=(0, 1, 0))):
        with Locations((-70.861766162, 36.105993834), (-4.561766162, 36.105993834), (83.738233838, 36.105993834), (83.788193598, -29.900023528), (-4.511705229, -30.033691472), (-70.811629263, -30.134055965)):
            Hole(F_2_9_2_9_DIAMETER_HOLE1_D / 2)

    # Fillet6
    fillet6_edges = [part.edges().sort_by_distance(p)[0] for p in [
        (85.438233838, 6.15, -32.105993834),
    ]]
    fillet(fillet6_edges, radius=FILLET6_R)

    # Fillet7
    fillet7_edges = [part.edges().sort_by_distance(p)[0] for p in [
        (85.438233838, 6.15, 25.894006166),
    ]]
    fillet(fillet7_edges, radius=FILLET7_R)

    # Fillet8
    fillet8_edges = [part.edges().sort_by_distance(p)[0] for p in [
        (-72.561766162, 6.15, -32.105993834),
        (-72.561766162, 6.15, 25.894006166),
    ]]
    fillet(fillet8_edges, radius=FILLET8_R)

    # Chamfer1
    chamfer1_edges = [part.edges().sort_by_distance(p)[0] for p in [
        (-68.061766162, 2, -30.605993834),
        (-68.061766162, 2, 18.394006166),
        (-10.061766162, 2, 18.394006166),
        (-10.061766162, 2, -30.605993834),
    ]]
    chamfer(chamfer1_edges, length=CHAMFER1_SIZE)

    # Chamfer2
    # the kernel refuses this chamfer: 1 mm, written as the material it adds along each edge
    with BuildSketch(Plane(origin=(9.36655085, 2, -32.105993834), x_dir=(0, 0.9996219169112968, -0.027495876610589075), z_dir=(1, 0, 0)), Plane(origin=(83.438233838, 2, 25.894006166), x_dir=(0, 0.9996219169112968, 0.027495876610585623), z_dir=(-1, 0, 0))) as chamfer2_piece_1:
        Polygon((CHAMFER2_SIZE * 0.999621916911, CHAMFER2_SIZE * 0.0274958766106), (-CHAMFER2_SIZE * 0.0274958766106, CHAMFER2_SIZE * 0.999621916911), (0, 0), align=None)
    extrude(amount=74.071682988)
    with BuildSketch(Plane(origin=(83.438233838, 2, -30.105993834), x_dir=(1, 0, 0), z_dir=(0, 0, 1))) as chamfer2_piece_2:
        Polygon((2 - CHAMFER2_SIZE, 0), (2, CHAMFER2_SIZE), (2, 0), align=None)
    revolve(axis=Axis((83.438233838, 2, -30.105993834), (0, 1, 0)), revolution_arc=90)
    with BuildSketch(Plane(origin=(85.438233838, 2, -30.105993834), x_dir=(-0.9996219169112968, -0.02749587661058639, 0), z_dir=(0, 0, 1)), Plane(origin=(-72.561766162, 2, 23.894006166), x_dir=(0.9996219169112968, -0.027495876610586605, 0), z_dir=(0, 0, -1))) as chamfer2_piece_3:
        Polygon((CHAMFER2_SIZE * 0.999621916911, -CHAMFER2_SIZE * 0.0274958766106), (-CHAMFER2_SIZE * 0.0274958766106, -CHAMFER2_SIZE * 0.999621916911), (0, 0), align=None)
    extrude(amount=54)
    with BuildSketch(Plane(origin=(83.438233838, 2, 23.894006166), x_dir=(1, 0, 0), z_dir=(0, 0, -1))) as chamfer2_piece_4:
        Polygon((2 - CHAMFER2_SIZE, 0), (2, -CHAMFER2_SIZE), (2, 0), align=None)
    revolve(axis=Axis((83.438233838, 2, 23.894006166), (0, -1, 0)), revolution_arc=90)
    with BuildSketch(Plane(origin=(12.509916826, 2, 25.894006166), x_dir=(0, -0.027495876610586296, -0.9996219169112968), z_dir=(-1, 0, 0)), Plane(origin=(-70.561766162, 2, -32.105993834), x_dir=(0, -0.027495876610586296, 0.9996219169112968), z_dir=(1, 0, 0))) as chamfer2_piece_5:
        Polygon((CHAMFER2_SIZE * 0.999621916911, -CHAMFER2_SIZE * 0.0274958766106), (-CHAMFER2_SIZE * 0.0274958766106, -CHAMFER2_SIZE * 0.999621916911), (0, 0), align=None)
    extrude(amount=83.071682988)
    with BuildSketch(Plane(origin=(-70.561766162, 2, -30.105993834), x_dir=(0, 0, -1), z_dir=(1, 0, 0))) as chamfer2_piece_6:
        Polygon((2 - CHAMFER2_SIZE, 0), (2, CHAMFER2_SIZE), (2, 0), align=None)
    revolve(axis=Axis((-70.561766162, 2, -30.105993834), (0, 1, 0)), revolution_arc=90)
    with BuildSketch(Plane(origin=(-70.561766162, 2, 23.894006166), x_dir=(0, 0, 1), z_dir=(1, 0, 0))) as chamfer2_piece_7:
        Polygon((2 - CHAMFER2_SIZE, 0), (2, -CHAMFER2_SIZE), (2, 0), align=None)
    revolve(axis=Axis((-70.561766162, 2, 23.894006166), (0, -1, 0)), revolution_arc=90)
    with BuildSketch(Plane(origin=(9.938233838, 2, 28.465689154), x_dir=(-0.9996219169112968, -0.027495876610586296, 0), z_dir=(0, 0, -1))) as chamfer2_piece_8_section:
        Polygon((CHAMFER2_SIZE * 0.999621916911, CHAMFER2_SIZE * 0.0274958766106), (-CHAMFER2_SIZE * 0.0274958766106, CHAMFER2_SIZE * 0.999621916911), (0, 0), align=None)
    chamfer2_piece_8 = extrude(amount=63.143365976, mode=Mode.PRIVATE)
    chamfer2_piece_8 = split(chamfer2_piece_8, bisect_by=Plane(origin=(9.604900504, 2.333333333, 28.194006166), z_dir=(0, 0, -1)), keep=Keep.TOP, mode=Mode.PRIVATE)
    chamfer2_piece_8 = split(chamfer2_piece_8, bisect_by=Plane(origin=(9.604900504, 2.333333333, -34.405993834), z_dir=(0, 0, 1)), keep=Keep.TOP, mode=Mode.PRIVATE)
    add(chamfer2_piece_8)
    with BuildSketch(Plane(origin=(11.938233838, 2, -34.677676822), x_dir=(-0.027495876610585623, 0.9996219169112968, 0), z_dir=(0, 0, 1))) as chamfer2_piece_9_section:
        Polygon((CHAMFER2_SIZE * 0.999621916911, -CHAMFER2_SIZE * 0.0274958766106), (-CHAMFER2_SIZE * 0.0274958766106, -CHAMFER2_SIZE * 0.999621916911), (0, 0), align=None)
    chamfer2_piece_9 = extrude(amount=63.143365976, mode=Mode.PRIVATE)
    chamfer2_piece_9 = split(chamfer2_piece_9, bisect_by=Plane(origin=(12.271567171, 2.333333333, 28.194006166), z_dir=(0, 0, -1)), keep=Keep.TOP, mode=Mode.PRIVATE)
    chamfer2_piece_9 = split(chamfer2_piece_9, bisect_by=Plane(origin=(12.271567171, 2.333333333, -34.405993834), z_dir=(0, 0, 1)), keep=Keep.TOP, mode=Mode.PRIVATE)
    add(chamfer2_piece_9)

    # Fillet9
    fillet9_edges = [part.edges().sort_by_distance(p)[0] for p in [
        (-54.861766162, 7.4, 28.194006166),
        (-47.777982648, 8.9, 28.194006166),
        (-39.527982648, 7.5, 28.194006166),
        (-31.277982648, 8.9, 28.194006166),
        (-18.061766162, 7.3, 28.194006166),
        (-74.861766162, 5.5, -9.732922372),
        (-74.861766162, 3.5, -2.982922372),
        (-74.861766162, 5.5, 3.767077628),
        (-58.971577884, 4.5, 28.194006166),
        (-65.402082249, 4.5, 28.936033536),
    ]]
    fillet(fillet9_edges, radius=FILLET9_R)


solid = part.part
